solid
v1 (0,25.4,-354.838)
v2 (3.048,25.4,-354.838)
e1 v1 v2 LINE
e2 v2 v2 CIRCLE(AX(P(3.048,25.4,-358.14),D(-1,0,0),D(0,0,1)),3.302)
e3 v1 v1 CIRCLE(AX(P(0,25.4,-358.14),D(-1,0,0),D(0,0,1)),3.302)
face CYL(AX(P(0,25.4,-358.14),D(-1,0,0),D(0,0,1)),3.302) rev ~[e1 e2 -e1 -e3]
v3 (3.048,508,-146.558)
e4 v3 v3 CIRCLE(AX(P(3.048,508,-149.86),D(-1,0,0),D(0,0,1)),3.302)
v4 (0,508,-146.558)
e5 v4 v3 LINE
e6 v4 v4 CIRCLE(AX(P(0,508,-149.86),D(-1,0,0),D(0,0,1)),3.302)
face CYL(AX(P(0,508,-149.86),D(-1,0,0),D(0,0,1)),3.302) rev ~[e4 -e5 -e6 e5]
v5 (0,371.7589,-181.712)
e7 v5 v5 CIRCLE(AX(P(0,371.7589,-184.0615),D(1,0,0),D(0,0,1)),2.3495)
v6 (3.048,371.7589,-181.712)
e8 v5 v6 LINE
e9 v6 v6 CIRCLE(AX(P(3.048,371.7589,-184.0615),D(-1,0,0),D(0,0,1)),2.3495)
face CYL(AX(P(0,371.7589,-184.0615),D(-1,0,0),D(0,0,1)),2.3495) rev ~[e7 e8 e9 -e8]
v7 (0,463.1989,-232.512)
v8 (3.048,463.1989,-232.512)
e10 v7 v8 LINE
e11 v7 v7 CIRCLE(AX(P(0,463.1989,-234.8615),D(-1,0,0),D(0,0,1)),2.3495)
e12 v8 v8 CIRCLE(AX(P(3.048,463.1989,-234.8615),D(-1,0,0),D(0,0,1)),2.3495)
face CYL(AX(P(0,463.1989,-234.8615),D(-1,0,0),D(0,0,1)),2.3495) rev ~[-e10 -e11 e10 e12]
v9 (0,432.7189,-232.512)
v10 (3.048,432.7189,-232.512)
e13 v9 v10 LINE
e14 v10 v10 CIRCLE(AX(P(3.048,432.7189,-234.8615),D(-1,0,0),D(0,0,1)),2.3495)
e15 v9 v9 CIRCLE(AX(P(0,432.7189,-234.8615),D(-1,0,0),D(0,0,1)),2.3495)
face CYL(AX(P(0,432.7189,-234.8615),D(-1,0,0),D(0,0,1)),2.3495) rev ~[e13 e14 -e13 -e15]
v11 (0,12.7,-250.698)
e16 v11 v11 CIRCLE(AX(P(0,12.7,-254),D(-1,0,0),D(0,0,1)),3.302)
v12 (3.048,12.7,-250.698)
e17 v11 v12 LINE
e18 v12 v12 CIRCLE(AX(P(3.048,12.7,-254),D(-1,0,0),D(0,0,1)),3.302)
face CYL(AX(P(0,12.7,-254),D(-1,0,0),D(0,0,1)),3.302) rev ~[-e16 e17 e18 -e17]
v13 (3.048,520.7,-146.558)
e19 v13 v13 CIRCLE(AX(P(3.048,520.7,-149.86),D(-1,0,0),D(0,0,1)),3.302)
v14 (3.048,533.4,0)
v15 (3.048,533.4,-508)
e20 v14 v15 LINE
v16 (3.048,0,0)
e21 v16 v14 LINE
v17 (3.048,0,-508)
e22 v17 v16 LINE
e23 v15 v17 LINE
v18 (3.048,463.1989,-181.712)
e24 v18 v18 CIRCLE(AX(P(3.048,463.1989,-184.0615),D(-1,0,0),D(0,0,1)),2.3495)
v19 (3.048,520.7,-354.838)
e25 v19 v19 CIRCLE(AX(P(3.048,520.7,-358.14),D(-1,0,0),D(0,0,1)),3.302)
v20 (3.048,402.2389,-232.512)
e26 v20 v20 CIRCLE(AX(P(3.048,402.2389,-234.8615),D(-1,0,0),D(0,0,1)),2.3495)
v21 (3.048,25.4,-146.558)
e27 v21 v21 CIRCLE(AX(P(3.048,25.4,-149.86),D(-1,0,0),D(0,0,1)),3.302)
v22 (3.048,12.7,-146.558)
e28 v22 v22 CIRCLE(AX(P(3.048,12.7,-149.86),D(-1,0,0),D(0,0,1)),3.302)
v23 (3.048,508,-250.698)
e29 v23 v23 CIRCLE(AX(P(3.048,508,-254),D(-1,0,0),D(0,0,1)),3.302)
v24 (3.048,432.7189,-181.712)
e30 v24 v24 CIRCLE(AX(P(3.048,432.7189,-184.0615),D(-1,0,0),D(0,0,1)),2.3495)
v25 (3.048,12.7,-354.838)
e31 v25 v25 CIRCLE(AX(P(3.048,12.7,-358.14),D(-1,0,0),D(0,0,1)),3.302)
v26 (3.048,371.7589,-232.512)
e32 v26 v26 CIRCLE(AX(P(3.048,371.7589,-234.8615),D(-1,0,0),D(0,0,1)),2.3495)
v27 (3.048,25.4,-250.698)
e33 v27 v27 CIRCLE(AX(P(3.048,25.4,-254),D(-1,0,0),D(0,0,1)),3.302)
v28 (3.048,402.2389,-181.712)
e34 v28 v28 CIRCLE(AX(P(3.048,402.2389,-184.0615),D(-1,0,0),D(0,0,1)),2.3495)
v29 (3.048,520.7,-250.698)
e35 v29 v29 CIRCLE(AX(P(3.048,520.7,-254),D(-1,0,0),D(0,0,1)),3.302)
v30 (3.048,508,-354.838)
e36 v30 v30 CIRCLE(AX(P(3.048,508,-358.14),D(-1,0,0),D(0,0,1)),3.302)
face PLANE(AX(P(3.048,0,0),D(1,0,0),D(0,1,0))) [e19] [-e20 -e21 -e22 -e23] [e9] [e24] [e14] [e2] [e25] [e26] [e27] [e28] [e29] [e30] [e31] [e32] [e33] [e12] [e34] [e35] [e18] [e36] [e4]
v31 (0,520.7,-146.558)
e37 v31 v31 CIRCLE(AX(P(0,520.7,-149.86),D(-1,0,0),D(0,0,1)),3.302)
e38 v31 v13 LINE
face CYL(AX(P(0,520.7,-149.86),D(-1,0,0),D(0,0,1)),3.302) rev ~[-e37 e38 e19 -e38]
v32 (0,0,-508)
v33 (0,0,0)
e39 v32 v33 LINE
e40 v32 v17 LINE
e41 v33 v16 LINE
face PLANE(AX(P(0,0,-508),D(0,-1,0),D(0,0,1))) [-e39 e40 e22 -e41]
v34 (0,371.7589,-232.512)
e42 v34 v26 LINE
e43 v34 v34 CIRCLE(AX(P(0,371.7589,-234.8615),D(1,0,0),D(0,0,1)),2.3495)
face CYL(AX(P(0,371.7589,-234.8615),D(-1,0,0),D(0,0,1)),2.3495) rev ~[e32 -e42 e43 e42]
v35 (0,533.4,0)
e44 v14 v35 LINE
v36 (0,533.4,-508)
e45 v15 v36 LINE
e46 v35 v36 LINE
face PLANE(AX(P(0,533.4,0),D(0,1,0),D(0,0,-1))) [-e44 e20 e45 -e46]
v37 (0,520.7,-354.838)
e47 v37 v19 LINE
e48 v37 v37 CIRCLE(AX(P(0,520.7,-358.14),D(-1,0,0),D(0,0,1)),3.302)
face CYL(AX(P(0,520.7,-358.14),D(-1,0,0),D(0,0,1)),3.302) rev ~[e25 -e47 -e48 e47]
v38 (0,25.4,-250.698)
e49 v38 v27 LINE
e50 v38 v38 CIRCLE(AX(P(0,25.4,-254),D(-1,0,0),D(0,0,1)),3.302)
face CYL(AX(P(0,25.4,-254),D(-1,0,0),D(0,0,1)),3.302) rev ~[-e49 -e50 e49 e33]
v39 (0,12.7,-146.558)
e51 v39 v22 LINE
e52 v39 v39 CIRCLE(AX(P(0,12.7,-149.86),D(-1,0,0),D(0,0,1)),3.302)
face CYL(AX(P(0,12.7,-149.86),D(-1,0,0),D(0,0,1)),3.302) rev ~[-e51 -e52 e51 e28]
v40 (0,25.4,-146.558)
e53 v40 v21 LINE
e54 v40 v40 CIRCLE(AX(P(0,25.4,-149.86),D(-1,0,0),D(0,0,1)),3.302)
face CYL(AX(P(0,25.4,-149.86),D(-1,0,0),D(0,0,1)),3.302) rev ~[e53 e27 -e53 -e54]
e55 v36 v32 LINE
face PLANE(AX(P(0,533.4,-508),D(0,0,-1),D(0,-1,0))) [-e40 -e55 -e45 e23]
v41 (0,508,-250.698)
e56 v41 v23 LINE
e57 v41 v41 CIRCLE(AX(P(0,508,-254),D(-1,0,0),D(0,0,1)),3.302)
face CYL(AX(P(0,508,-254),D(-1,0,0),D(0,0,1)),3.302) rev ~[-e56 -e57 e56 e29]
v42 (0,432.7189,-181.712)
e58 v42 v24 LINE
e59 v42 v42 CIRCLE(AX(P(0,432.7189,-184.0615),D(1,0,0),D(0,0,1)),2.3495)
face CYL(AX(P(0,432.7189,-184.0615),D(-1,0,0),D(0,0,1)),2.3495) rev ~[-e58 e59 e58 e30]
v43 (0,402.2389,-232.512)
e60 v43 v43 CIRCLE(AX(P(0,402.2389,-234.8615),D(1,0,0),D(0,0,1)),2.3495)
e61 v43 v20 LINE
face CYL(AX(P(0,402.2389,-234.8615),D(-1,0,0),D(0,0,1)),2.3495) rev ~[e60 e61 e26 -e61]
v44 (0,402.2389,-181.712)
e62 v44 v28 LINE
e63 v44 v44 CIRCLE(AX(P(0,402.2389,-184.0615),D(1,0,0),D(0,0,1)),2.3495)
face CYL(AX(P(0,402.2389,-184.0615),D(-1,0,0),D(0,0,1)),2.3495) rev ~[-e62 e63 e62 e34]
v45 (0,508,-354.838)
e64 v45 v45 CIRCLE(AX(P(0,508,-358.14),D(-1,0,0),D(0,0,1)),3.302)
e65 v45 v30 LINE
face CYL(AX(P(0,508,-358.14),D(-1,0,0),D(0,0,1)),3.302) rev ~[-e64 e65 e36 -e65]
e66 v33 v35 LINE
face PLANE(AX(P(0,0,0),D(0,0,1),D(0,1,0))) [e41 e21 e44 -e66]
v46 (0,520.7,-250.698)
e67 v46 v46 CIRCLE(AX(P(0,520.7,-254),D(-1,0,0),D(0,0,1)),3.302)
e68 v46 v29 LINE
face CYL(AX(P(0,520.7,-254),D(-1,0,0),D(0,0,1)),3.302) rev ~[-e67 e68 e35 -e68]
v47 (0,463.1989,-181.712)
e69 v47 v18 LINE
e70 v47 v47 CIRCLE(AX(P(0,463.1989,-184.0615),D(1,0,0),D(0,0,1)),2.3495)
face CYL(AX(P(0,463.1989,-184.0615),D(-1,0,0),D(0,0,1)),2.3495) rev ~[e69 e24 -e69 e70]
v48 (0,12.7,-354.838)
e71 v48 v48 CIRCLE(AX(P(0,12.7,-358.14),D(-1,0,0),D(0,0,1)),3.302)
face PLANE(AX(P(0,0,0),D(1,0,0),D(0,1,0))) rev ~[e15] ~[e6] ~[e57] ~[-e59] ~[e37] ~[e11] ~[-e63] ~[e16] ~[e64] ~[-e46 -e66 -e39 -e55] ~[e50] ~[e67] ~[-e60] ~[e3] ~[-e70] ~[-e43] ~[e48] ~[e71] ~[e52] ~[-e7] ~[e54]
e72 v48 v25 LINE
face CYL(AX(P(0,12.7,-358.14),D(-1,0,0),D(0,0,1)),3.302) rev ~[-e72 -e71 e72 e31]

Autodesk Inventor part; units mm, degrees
ref_plane "YZ Plane" through (0, 0, 0) normal (1, 0, 0) x (0, 1, 0)
ref_plane "XZ Plane" through (0, 0, 0) normal (0, 1, 0) x (-1, 0, 0)
ref_plane "XY Plane" through (0, 0, 0) normal (0, 0, 1) x (1, 0, 0)
sketch "Sketch1" plane through (0, 0, 0) normal (1, 0, 0) x (0, 1, 0)
  line L0 (0, 0) -> (533.4, 0)
  line L1 (533.4, 0) -> (533.4, -508)
  line L2 (533.4, -508) -> (0, -508)
  line L3 (0, -508) -> (0, 0)
  dimension "d0" = 533.4
  dimension "d1" = 508
extrude "Extrusion1" add sketch "Sketch1" along normal blind 1.5875
sketch "Sketch3" plane through (0, 0, 0) normal (-1, 0, 0) x (0, 0, 1)
  line L0 (-508, 0) -> (-508, 533.4) projected
  line L1 (0, 0) -> (-508, 0) projected
  circle A0 centre (-358.14, 12.7) radius 3.302
  circle A1 centre (-358.14, 25.4) radius 3.302
  circle A2 centre (-149.86, 12.7) radius 3.302
  circle A3 centre (-149.86, 25.4) radius 3.302
  circle A4 centre (-254, 12.7) radius 3.302
  circle A5 centre (-254, 25.4) radius 3.302
  circle A6 centre (-358.14, 508) radius 3.302
  circle A7 centre (-358.14, 520.7) radius 3.302
  circle A8 centre (-149.86, 508) radius 3.302
  circle A9 centre (-149.86, 520.7) radius 3.302
  circle A10 centre (-254, 508) radius 3.302
  circle A11 centre (-254, 520.7) radius 3.302
extrude "Extrusion5" cut sketch "Sketch3" against normal up to surface (1.5875 mm away) contours A0 | A1 | A2 | A3 | A4 | A5
sheet face with bend "Face1" sketch "Sketch1" thickness 3.048 toward (1, 0, 0) bend radius 3.048
bend "Bend1"
extrude "Cut1" cut sketch "Sketch3" against normal up to surface (3.048 mm away)
sketch "Sketch4" plane through (0, 0, 0) normal (-1, 0, 0) x (0, 0, 1)
  circle A0 centre (-184.0615, 463.1989) radius 2.3495
  line L0 (-184.0615, 463.1989) -> (-234.8615, 463.1989)
  circle A1 centre (-234.8615, 463.1989) radius 2.3495
  line L1 (-184.0615, 463.1989) -> (-184.0615, 447.9589)
  line L2 (-184.0615, 447.9589) -> (-184.0615, 432.7189)
  circle A2 centre (-184.0615, 432.7189) radius 2.3495
  circle A3 centre (-234.8615, 432.7189) radius 2.3495
  line L3 (-184.0615, 432.7189) -> (-184.0615, 417.4789)
  line L4 (-184.0615, 417.4789) -> (-184.0615, 402.2389)
  line L5 (-184.0615, 402.2389) -> (-234.8615, 402.2389)
  line L6 (-234.8615, 402.2389) -> (-234.8615, 386.9989)
  line L7 (-234.8615, 386.9989) -> (-234.8615, 371.7589)
  line L8 (-234.8615, 371.7589) -> (-184.0615, 371.7589)
  circle A4 centre (-184.0615, 402.2389) radius 2.3495
  circle A5 centre (-234.8615, 402.2389) radius 2.3495
  circle A6 centre (-234.8615, 371.7589) radius 2.3495
  circle A7 centre (-184.0615, 371.7589) radius 2.3495
  point P0 (0, 0)
  dimension "d47" = 50.8
  dimension "d48" = 4.699
  dimension "d49" = 15.24
  dimension "d50" = 15.24
  dimension "d51" = 4.699
  dimension "d52" = 4.699
  dimension "d53" = 15.24
  dimension "d54" = 15.24
  dimension "d55" = 15.24
  dimension "d56" = 15.24
  dimension "d57" = 4.699
  dimension "d58" = 4.699
  dimension "d59" = 4.699
  dimension "d60" = 4.699
extrude "Cut2" cut sketch "Sketch4" against normal blind 3.048
equation "\"d38\" = Thickness"
equation "\"d43\" = Thickness"
equation "\"d32\" = Thickness"
equation "\"d33\" = BendRadius"
equation "\"d34\" = BendReliefWidth"
equation "\"d36\" = MinimumRemnant"
equation "\"d35\" = BendReliefDepth"
equation "\"d37\" = TransitionRadius"
equation "\"BendRadius\" = Thickness"
equation "\"BendReliefWidth\" = Thickness"
equation "\"BendReliefDepth\" = 0.5 * Thickness"
equation "\"CornerReliefSize\" = 4 * Thickness"
equation "\"MinimumRemnant\" = 2 * Thickness"
equation "\"TransitionRadius\" = BendRadius"
equation "\"JacobiRadiusSize\" = BendRadius"
equation "\"GapSize\" = Thickness"
equation "\"Thickness\" = 3.048"
properties part number "BottomV4" material "Steel"
